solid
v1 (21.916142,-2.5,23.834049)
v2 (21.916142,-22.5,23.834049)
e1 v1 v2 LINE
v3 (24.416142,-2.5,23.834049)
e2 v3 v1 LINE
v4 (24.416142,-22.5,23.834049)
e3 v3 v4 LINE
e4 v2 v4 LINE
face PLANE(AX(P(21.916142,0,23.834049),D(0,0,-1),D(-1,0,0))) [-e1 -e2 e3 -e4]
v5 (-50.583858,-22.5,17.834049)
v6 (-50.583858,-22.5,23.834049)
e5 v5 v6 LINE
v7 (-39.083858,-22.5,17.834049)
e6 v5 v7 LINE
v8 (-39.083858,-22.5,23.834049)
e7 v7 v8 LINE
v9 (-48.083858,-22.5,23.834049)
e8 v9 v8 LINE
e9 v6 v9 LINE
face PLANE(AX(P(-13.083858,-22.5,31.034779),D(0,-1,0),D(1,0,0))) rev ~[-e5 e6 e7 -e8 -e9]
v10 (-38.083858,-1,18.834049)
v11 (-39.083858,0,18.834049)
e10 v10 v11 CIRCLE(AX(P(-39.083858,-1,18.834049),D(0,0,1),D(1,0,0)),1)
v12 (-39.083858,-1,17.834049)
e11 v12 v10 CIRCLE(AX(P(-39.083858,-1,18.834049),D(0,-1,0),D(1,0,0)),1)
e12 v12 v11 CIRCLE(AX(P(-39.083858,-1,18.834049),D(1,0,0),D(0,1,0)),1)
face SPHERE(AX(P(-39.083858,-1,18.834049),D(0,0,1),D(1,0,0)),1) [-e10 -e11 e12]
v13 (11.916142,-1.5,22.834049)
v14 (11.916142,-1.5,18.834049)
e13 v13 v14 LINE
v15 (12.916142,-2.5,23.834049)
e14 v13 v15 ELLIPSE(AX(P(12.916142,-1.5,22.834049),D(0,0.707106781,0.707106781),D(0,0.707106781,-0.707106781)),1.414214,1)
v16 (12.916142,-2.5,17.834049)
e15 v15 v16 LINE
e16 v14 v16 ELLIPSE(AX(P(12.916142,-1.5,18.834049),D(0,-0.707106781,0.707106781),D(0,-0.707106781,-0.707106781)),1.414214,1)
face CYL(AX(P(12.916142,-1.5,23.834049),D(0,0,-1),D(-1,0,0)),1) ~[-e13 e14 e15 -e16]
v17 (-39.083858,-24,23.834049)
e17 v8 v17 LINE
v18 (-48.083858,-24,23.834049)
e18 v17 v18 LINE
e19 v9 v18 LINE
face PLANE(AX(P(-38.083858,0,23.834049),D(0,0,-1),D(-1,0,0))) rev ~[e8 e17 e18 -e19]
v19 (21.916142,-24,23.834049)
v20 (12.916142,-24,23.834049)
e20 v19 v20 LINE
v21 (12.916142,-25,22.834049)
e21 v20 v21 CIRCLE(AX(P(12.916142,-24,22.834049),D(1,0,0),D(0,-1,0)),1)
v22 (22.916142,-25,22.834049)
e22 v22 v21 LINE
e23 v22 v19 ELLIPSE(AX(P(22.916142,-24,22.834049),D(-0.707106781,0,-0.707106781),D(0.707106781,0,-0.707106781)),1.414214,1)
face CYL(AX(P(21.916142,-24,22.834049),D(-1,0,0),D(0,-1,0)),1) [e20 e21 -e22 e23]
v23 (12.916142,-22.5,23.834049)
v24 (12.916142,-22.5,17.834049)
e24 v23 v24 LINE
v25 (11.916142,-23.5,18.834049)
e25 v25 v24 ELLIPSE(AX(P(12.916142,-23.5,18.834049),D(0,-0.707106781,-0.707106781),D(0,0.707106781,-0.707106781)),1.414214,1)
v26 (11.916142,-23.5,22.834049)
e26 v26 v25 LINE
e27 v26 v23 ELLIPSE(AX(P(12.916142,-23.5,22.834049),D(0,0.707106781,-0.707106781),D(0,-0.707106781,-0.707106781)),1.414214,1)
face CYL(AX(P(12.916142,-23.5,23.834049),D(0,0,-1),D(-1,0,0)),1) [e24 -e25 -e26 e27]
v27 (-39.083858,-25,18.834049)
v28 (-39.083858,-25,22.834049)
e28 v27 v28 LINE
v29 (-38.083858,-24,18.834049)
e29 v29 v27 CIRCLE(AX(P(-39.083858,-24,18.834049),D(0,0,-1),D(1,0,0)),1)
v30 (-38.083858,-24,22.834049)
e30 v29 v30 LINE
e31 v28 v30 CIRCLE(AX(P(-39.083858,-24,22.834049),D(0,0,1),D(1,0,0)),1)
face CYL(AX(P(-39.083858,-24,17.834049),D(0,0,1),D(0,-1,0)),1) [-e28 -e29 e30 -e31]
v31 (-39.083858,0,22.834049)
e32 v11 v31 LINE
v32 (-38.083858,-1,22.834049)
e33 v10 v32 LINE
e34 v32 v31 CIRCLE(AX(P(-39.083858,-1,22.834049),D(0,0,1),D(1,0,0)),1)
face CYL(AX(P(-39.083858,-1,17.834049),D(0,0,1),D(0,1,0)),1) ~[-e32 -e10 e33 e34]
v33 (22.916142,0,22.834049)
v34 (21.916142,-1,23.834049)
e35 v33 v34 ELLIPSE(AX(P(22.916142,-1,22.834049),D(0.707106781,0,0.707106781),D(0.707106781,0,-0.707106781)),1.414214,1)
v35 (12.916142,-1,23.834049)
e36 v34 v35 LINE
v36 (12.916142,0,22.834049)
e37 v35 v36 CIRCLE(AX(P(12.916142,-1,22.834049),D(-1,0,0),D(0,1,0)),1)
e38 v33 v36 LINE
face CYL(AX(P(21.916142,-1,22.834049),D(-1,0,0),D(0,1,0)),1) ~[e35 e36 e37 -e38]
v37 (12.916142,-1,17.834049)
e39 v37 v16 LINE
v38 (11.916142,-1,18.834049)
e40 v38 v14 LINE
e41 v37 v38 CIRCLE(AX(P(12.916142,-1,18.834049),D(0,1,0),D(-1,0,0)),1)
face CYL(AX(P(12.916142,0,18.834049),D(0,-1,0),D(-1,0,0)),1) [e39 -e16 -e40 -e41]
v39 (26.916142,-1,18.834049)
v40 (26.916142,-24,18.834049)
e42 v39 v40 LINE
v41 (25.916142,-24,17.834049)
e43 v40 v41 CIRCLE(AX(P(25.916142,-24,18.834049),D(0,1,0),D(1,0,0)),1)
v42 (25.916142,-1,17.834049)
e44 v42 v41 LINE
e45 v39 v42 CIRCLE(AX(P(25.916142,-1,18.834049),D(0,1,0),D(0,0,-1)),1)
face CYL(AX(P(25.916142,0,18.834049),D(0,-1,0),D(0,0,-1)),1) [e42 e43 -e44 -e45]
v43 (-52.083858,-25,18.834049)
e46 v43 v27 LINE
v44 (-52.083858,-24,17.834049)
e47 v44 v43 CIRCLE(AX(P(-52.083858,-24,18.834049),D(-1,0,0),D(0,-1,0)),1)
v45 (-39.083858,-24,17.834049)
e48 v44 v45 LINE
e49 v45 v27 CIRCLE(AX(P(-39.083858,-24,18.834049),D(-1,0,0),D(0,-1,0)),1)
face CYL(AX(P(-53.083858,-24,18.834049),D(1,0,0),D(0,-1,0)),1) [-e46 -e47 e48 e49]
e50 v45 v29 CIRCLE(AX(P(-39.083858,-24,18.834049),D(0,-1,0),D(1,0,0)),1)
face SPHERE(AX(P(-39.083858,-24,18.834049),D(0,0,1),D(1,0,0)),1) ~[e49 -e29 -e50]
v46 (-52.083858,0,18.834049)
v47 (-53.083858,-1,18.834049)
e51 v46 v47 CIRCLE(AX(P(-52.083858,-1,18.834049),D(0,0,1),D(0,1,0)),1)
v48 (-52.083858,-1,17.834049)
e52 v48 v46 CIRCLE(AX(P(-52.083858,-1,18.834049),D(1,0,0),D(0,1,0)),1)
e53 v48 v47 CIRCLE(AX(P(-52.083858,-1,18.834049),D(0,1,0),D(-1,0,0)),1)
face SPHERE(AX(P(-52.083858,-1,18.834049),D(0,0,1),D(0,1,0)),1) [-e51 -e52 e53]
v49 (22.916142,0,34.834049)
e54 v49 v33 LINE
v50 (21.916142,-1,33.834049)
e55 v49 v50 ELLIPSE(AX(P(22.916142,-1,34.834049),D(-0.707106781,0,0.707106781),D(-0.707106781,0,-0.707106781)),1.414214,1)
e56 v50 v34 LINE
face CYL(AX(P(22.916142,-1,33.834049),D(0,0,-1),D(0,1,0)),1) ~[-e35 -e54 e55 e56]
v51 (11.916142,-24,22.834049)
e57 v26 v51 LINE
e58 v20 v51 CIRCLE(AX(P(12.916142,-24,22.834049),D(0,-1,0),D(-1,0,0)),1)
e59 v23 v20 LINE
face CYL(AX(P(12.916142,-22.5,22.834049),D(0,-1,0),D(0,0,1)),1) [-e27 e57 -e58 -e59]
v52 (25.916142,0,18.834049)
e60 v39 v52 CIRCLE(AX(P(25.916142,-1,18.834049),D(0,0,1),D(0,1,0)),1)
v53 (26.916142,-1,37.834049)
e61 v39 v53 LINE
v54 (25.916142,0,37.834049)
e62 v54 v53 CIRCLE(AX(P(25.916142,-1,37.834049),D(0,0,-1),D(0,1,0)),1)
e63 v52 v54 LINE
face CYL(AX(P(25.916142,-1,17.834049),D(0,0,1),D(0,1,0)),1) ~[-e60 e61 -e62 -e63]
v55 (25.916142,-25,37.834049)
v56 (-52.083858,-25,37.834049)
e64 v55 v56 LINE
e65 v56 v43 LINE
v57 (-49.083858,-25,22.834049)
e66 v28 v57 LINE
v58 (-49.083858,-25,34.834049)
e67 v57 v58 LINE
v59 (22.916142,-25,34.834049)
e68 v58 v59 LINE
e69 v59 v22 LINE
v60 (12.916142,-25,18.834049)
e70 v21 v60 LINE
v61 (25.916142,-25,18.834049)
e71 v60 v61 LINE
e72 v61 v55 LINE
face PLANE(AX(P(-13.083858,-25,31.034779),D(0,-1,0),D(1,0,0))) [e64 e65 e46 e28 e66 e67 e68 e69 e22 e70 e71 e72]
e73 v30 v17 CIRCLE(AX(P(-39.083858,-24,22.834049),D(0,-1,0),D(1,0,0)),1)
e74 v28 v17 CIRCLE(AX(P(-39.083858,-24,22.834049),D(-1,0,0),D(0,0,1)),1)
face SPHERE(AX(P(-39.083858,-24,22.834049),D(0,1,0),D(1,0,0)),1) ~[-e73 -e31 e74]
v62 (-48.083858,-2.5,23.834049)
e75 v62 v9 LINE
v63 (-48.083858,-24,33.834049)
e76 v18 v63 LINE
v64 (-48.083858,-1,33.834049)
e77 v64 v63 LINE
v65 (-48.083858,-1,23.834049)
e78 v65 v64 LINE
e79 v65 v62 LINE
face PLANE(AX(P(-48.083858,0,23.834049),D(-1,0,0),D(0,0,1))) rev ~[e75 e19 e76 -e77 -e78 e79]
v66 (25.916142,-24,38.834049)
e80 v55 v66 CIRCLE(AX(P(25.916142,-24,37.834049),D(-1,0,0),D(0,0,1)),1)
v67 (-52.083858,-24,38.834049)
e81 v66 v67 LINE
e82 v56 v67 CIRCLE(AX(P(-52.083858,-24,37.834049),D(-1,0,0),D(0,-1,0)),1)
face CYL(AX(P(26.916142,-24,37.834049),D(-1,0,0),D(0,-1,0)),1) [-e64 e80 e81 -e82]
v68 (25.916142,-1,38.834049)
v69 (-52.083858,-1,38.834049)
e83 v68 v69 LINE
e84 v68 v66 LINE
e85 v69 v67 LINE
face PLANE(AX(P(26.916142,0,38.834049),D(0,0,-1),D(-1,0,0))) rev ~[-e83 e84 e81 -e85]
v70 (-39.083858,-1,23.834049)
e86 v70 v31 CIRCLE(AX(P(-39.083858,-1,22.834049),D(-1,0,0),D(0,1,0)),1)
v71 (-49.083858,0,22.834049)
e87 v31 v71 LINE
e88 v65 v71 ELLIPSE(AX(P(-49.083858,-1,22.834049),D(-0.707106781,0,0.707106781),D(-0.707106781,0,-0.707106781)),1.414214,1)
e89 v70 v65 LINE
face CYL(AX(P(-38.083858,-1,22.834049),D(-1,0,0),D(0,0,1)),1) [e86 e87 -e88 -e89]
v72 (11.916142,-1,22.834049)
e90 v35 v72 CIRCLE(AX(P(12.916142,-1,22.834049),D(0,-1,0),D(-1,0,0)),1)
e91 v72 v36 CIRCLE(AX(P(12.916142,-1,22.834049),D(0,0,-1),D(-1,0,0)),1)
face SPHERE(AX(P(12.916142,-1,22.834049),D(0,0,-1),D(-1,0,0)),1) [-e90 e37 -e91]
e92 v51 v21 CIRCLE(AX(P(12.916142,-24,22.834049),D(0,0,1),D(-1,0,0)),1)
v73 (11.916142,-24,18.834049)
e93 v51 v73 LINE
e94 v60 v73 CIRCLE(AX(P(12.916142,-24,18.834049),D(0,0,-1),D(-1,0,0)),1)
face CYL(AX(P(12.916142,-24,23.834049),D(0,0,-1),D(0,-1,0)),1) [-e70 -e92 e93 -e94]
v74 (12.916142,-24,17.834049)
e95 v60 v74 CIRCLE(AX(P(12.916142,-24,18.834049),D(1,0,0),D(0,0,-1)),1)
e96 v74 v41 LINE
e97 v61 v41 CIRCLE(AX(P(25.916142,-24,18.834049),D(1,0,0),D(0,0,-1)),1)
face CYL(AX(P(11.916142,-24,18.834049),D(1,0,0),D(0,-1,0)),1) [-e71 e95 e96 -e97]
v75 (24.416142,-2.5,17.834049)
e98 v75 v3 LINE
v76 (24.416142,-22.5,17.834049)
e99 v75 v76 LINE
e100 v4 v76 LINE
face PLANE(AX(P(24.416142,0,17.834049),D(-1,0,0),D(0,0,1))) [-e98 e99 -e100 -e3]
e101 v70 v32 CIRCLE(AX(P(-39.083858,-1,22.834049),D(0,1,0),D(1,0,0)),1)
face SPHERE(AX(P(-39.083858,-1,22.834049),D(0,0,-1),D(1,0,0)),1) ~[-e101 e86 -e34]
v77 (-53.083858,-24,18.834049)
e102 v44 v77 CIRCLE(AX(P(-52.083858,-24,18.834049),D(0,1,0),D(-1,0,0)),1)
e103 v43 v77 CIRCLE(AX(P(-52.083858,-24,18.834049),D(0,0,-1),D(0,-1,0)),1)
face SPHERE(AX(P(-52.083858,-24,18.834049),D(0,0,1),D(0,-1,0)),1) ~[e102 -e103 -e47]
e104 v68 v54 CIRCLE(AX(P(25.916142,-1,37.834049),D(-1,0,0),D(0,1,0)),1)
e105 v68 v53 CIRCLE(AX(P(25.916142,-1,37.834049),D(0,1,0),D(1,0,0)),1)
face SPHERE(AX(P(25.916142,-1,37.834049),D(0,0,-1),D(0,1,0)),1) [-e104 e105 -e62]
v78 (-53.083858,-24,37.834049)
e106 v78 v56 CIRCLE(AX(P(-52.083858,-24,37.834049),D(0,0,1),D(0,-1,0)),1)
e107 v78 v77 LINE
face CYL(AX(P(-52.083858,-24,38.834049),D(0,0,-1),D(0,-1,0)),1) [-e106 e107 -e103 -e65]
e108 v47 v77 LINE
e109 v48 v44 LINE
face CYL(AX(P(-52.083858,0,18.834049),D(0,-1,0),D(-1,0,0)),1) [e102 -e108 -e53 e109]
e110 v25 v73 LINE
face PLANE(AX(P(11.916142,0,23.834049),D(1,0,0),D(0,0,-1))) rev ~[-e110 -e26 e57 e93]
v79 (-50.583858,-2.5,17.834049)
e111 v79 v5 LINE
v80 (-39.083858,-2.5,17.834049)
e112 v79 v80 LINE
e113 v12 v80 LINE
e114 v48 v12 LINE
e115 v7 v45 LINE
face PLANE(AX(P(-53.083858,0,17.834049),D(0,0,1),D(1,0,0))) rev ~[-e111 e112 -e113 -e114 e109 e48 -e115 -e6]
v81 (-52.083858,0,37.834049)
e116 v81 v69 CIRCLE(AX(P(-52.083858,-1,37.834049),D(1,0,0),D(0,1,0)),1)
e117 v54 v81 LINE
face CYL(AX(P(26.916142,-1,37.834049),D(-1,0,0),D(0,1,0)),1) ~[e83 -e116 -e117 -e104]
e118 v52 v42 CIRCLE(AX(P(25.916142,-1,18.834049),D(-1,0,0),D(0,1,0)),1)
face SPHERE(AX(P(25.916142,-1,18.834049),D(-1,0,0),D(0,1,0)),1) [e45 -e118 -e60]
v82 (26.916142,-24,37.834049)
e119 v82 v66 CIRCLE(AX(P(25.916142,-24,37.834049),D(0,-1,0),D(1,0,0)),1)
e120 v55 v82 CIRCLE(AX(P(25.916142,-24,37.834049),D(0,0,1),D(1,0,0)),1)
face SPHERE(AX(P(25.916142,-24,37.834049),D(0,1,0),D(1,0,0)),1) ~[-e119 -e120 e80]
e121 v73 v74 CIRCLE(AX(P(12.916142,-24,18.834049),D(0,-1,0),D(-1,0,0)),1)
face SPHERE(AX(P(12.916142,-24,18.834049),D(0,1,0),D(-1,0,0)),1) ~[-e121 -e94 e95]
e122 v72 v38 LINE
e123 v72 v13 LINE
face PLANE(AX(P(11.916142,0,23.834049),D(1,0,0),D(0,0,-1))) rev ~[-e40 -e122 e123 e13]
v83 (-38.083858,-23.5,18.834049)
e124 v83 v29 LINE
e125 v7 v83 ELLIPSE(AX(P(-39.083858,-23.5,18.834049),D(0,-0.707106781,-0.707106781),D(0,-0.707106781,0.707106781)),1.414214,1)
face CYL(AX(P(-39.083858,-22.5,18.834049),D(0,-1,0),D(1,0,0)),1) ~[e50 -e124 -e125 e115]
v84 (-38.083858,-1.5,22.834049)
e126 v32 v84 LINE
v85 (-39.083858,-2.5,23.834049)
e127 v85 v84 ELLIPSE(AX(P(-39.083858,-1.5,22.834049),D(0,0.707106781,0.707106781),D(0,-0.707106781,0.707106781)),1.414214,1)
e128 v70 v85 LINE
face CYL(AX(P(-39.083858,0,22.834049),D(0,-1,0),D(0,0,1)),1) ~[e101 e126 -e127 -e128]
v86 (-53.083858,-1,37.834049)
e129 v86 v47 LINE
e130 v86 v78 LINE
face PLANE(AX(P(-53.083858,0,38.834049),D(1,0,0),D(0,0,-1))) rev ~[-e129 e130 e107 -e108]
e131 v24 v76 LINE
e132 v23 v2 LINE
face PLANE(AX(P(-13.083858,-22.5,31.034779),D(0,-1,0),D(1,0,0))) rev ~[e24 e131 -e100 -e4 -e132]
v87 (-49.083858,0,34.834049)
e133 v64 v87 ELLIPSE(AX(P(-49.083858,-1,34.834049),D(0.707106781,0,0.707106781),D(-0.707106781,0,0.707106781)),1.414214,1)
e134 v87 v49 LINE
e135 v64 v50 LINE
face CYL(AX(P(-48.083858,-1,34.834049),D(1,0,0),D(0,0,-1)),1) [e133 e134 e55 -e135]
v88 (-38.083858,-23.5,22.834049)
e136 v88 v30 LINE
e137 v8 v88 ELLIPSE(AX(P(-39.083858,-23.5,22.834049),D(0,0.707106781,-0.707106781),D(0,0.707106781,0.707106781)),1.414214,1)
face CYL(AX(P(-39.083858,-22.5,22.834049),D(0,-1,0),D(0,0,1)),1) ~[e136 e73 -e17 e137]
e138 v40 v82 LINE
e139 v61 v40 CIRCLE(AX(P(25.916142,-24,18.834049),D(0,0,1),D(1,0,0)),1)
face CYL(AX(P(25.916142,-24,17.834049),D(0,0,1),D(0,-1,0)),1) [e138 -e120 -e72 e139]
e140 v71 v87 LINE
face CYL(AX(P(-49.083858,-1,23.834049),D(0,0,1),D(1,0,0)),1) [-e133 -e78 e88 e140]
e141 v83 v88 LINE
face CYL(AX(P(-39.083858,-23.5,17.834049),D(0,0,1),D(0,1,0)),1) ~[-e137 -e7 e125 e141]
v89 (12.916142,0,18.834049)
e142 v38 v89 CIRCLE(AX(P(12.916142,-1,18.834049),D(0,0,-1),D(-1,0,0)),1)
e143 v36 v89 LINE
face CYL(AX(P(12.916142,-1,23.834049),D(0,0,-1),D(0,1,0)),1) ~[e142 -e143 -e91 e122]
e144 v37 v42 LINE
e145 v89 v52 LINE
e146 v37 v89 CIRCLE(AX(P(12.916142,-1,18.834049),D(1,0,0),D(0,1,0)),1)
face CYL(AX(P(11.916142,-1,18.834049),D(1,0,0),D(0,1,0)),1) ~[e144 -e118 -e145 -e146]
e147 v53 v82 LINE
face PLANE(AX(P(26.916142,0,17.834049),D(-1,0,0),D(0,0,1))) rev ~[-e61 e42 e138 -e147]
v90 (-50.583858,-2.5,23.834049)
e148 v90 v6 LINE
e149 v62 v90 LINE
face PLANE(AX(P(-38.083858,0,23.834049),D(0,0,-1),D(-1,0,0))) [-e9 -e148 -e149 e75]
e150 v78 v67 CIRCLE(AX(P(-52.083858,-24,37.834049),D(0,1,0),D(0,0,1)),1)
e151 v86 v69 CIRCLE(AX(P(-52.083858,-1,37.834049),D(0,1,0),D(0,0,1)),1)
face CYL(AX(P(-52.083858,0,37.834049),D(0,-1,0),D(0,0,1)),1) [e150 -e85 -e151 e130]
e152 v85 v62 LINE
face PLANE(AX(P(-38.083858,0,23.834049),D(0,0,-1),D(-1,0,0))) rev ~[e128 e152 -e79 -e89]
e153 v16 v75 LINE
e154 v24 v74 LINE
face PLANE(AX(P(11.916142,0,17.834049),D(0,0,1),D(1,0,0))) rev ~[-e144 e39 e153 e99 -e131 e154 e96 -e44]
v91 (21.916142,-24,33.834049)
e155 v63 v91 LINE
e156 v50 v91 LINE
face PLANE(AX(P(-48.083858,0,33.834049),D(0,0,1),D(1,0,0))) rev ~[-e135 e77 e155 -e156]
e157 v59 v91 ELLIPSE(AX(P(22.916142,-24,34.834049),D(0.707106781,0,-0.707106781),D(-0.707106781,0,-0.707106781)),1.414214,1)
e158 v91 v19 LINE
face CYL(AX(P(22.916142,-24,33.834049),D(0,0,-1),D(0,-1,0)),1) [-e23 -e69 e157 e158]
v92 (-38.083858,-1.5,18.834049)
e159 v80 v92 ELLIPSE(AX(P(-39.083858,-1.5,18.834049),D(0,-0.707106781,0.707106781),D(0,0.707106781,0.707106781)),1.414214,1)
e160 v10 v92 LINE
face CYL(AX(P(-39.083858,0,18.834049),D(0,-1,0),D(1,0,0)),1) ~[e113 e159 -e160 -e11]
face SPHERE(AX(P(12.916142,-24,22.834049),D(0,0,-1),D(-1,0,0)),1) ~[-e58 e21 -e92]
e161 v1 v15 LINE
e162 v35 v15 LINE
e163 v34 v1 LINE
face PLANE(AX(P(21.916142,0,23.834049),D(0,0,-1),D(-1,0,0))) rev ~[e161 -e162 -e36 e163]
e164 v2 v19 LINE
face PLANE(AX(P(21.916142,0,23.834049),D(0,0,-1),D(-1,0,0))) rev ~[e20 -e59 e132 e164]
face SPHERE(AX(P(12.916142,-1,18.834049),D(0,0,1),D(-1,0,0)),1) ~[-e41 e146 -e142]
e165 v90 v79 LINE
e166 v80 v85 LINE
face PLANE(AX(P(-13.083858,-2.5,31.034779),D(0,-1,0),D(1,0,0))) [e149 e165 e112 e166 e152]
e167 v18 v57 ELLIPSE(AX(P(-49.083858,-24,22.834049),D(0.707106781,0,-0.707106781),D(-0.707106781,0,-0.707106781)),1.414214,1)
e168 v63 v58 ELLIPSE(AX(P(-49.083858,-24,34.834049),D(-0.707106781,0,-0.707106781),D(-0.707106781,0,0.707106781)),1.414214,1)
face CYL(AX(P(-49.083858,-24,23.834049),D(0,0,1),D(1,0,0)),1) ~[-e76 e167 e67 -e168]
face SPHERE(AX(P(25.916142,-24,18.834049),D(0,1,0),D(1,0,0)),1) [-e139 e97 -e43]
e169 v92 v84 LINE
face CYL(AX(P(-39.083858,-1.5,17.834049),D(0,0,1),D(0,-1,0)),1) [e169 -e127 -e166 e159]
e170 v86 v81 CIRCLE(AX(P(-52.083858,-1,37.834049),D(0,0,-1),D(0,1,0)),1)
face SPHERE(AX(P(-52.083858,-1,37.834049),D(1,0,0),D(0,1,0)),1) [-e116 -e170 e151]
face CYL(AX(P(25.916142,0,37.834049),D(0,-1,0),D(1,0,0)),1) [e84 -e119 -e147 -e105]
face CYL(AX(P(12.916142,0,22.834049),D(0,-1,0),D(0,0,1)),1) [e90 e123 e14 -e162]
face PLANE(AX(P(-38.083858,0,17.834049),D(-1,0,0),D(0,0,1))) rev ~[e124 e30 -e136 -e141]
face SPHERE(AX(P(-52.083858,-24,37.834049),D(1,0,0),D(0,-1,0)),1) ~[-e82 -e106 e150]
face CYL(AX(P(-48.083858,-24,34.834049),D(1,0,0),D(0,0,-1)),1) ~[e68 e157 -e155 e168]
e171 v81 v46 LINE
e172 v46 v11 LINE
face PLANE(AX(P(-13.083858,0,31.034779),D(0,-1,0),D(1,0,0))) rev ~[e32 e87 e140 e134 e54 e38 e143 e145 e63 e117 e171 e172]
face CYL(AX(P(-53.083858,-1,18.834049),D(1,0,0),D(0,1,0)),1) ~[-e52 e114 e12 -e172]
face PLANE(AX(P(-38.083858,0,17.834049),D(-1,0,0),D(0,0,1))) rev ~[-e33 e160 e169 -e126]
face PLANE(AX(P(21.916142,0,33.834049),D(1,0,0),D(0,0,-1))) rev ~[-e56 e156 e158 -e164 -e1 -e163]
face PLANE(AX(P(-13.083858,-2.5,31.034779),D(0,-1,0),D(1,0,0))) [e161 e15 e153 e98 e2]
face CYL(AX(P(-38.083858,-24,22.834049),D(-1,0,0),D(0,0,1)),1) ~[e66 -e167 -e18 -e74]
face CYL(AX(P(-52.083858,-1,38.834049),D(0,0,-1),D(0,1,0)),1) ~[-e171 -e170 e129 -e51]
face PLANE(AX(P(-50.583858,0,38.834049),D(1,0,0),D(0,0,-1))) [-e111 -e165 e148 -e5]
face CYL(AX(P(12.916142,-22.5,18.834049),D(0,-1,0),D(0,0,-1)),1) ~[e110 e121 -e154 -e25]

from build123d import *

# Parameters (mm, degrees)
F1_DEPTH    = 25
F2_T        = 2.5
F2_T3_DEPTH = 30
F3_R        = 1


# Not quite as in the source:
# - a shell that OpenCascade refuses in one call is made with other operations: the cavity is built on its own and cut out


with BuildPart() as f1:
    # F0 (on Front) → F1 (new body)
    with BuildSketch(Plane.XZ):
        Polygon((-48.0838582665, 23.83404883), (-48.0838582665, 33.83404883), (21.9161417335, 33.83404883), (21.9161417335, 23.83404883), (11.9161417335, 23.83404883), (11.9161417335, 17.83404883), (21.9161417335, 17.83404883), (26.9161417335, 17.83404883), (26.9161417335, 38.83404883), (-53.0838582665, 38.83404883), (-53.0838582665, 17.83404883), (-48.0838582665, 17.83404883), (-38.0838582665, 17.83404883), (-38.0838582665, 23.83404883), align=None)
    extrude(amount=F1_DEPTH)

    # F2: shell of thickness 2.5, made by hand


with BuildPart() as f2_core1:
    # F2_t2: copy of F1
    add(f1.part)

    # the walls: a layer under each face that stays
    f2_faces = [f2_core1.faces().sort_by_distance(p)[0] for p in [
        (21.9161417335, -12.5, 28.83404883),
        (-39.7505249331, -25, 21.33404883),
        (-48.0838582665, -12.5, 28.83404883),
        (-53.0838582665, -12.5, 28.33404883),
        (-13.0838582665, -12.5, 38.83404883),
        (26.9161417335, -12.5, 28.33404883),
        (-39.7505249331, 0, 21.33404883),
        (-13.0838582665, -12.5, 33.83404883),
    ]]
    thicken(f2_faces, amount=-F2_T, mode=Mode.SUBTRACT)

    # F2_s4 → F2_t3 (cut)
    with BuildSketch(Plane.XZ.offset(-2.5)):
        Polygon((21.8911417335, 33.80904883), (24.4161417335, 33.83404883), (24.4161417335, 36.33404883), (21.9161417335, 36.33404883), align=None)
        Polygon((-48.0588582665, 33.80904883), (-50.5838582665, 33.83404883), (-50.5838582665, 36.33404883), (-48.0838582665, 36.33404883), align=None)
    extrude(amount=F2_T3_DEPTH, mode=Mode.SUBTRACT)


with BuildPart() as f1_1:
    add(f1.part)

    # what is left inside the walls is the cavity
    f2_cavity = [f2_core1.part.solids().sort_by_distance(p)[0] for p in [
        (18.166142, -15.833333, 23.809049),
        (-44.333858, -15.833333, 23.809049),
    ]]
    add(f2_cavity, mode=Mode.SUBTRACT)

    # F3
    f3_edges = [f1_1.edges().sort_by_distance(p)[0] for p in [
        (-38.083858, 0, 20.834049),
        (-38.083858, -1.25, 23.834049),
        (-38.083858, -2.5, 20.834049),
        (-38.083858, -1.25, 17.834049),
        (-38.083858, -22.5, 20.834049),
        (-38.083858, -23.75, 23.834049),
        (-38.083858, -25, 20.834049),
        (-38.083858, -23.75, 17.834049),
        (11.916142, 0, 20.834049),
        (11.916142, -1.25, 17.834049),
        (11.916142, -2.5, 20.834049),
        (11.916142, -1.25, 23.834049),
        (11.916142, -22.5, 20.834049),
        (11.916142, -23.75, 17.834049),
        (11.916142, -25, 20.834049),
        (11.916142, -23.75, 23.834049),
        (21.916142, 0, 28.834049),
        (16.916142, 0, 23.834049),
        (19.416142, 0, 17.834049),
        (26.916142, 0, 28.334049),
        (-13.083858, 0, 38.834049),
        (-53.083858, 0, 28.334049),
        (-45.583858, 0, 17.834049),
        (-43.083858, 0, 23.834049),
        (-48.083858, 0, 28.834049),
        (-13.083858, 0, 33.834049),
        (26.916142, -12.5, 17.834049),
        (26.916142, -12.5, 38.834049),
        (26.916142, -25, 28.334049),
        (21.916142, -25, 28.834049),
        (16.916142, -25, 23.834049),
        (19.416142, -25, 17.834049),
        (-13.083858, -25, 38.834049),
        (-53.083858, -25, 28.334049),
        (-45.583858, -25, 17.834049),
        (-43.083858, -25, 23.834049),
        (-48.083858, -25, 28.834049),
        (-13.083858, -25, 33.834049),
        (-53.083858, -12.5, 38.834049),
        (-53.083858, -12.5, 17.834049),
    ]]
    fillet(f3_edges, radius=F3_R)


solid = f1_1.part
